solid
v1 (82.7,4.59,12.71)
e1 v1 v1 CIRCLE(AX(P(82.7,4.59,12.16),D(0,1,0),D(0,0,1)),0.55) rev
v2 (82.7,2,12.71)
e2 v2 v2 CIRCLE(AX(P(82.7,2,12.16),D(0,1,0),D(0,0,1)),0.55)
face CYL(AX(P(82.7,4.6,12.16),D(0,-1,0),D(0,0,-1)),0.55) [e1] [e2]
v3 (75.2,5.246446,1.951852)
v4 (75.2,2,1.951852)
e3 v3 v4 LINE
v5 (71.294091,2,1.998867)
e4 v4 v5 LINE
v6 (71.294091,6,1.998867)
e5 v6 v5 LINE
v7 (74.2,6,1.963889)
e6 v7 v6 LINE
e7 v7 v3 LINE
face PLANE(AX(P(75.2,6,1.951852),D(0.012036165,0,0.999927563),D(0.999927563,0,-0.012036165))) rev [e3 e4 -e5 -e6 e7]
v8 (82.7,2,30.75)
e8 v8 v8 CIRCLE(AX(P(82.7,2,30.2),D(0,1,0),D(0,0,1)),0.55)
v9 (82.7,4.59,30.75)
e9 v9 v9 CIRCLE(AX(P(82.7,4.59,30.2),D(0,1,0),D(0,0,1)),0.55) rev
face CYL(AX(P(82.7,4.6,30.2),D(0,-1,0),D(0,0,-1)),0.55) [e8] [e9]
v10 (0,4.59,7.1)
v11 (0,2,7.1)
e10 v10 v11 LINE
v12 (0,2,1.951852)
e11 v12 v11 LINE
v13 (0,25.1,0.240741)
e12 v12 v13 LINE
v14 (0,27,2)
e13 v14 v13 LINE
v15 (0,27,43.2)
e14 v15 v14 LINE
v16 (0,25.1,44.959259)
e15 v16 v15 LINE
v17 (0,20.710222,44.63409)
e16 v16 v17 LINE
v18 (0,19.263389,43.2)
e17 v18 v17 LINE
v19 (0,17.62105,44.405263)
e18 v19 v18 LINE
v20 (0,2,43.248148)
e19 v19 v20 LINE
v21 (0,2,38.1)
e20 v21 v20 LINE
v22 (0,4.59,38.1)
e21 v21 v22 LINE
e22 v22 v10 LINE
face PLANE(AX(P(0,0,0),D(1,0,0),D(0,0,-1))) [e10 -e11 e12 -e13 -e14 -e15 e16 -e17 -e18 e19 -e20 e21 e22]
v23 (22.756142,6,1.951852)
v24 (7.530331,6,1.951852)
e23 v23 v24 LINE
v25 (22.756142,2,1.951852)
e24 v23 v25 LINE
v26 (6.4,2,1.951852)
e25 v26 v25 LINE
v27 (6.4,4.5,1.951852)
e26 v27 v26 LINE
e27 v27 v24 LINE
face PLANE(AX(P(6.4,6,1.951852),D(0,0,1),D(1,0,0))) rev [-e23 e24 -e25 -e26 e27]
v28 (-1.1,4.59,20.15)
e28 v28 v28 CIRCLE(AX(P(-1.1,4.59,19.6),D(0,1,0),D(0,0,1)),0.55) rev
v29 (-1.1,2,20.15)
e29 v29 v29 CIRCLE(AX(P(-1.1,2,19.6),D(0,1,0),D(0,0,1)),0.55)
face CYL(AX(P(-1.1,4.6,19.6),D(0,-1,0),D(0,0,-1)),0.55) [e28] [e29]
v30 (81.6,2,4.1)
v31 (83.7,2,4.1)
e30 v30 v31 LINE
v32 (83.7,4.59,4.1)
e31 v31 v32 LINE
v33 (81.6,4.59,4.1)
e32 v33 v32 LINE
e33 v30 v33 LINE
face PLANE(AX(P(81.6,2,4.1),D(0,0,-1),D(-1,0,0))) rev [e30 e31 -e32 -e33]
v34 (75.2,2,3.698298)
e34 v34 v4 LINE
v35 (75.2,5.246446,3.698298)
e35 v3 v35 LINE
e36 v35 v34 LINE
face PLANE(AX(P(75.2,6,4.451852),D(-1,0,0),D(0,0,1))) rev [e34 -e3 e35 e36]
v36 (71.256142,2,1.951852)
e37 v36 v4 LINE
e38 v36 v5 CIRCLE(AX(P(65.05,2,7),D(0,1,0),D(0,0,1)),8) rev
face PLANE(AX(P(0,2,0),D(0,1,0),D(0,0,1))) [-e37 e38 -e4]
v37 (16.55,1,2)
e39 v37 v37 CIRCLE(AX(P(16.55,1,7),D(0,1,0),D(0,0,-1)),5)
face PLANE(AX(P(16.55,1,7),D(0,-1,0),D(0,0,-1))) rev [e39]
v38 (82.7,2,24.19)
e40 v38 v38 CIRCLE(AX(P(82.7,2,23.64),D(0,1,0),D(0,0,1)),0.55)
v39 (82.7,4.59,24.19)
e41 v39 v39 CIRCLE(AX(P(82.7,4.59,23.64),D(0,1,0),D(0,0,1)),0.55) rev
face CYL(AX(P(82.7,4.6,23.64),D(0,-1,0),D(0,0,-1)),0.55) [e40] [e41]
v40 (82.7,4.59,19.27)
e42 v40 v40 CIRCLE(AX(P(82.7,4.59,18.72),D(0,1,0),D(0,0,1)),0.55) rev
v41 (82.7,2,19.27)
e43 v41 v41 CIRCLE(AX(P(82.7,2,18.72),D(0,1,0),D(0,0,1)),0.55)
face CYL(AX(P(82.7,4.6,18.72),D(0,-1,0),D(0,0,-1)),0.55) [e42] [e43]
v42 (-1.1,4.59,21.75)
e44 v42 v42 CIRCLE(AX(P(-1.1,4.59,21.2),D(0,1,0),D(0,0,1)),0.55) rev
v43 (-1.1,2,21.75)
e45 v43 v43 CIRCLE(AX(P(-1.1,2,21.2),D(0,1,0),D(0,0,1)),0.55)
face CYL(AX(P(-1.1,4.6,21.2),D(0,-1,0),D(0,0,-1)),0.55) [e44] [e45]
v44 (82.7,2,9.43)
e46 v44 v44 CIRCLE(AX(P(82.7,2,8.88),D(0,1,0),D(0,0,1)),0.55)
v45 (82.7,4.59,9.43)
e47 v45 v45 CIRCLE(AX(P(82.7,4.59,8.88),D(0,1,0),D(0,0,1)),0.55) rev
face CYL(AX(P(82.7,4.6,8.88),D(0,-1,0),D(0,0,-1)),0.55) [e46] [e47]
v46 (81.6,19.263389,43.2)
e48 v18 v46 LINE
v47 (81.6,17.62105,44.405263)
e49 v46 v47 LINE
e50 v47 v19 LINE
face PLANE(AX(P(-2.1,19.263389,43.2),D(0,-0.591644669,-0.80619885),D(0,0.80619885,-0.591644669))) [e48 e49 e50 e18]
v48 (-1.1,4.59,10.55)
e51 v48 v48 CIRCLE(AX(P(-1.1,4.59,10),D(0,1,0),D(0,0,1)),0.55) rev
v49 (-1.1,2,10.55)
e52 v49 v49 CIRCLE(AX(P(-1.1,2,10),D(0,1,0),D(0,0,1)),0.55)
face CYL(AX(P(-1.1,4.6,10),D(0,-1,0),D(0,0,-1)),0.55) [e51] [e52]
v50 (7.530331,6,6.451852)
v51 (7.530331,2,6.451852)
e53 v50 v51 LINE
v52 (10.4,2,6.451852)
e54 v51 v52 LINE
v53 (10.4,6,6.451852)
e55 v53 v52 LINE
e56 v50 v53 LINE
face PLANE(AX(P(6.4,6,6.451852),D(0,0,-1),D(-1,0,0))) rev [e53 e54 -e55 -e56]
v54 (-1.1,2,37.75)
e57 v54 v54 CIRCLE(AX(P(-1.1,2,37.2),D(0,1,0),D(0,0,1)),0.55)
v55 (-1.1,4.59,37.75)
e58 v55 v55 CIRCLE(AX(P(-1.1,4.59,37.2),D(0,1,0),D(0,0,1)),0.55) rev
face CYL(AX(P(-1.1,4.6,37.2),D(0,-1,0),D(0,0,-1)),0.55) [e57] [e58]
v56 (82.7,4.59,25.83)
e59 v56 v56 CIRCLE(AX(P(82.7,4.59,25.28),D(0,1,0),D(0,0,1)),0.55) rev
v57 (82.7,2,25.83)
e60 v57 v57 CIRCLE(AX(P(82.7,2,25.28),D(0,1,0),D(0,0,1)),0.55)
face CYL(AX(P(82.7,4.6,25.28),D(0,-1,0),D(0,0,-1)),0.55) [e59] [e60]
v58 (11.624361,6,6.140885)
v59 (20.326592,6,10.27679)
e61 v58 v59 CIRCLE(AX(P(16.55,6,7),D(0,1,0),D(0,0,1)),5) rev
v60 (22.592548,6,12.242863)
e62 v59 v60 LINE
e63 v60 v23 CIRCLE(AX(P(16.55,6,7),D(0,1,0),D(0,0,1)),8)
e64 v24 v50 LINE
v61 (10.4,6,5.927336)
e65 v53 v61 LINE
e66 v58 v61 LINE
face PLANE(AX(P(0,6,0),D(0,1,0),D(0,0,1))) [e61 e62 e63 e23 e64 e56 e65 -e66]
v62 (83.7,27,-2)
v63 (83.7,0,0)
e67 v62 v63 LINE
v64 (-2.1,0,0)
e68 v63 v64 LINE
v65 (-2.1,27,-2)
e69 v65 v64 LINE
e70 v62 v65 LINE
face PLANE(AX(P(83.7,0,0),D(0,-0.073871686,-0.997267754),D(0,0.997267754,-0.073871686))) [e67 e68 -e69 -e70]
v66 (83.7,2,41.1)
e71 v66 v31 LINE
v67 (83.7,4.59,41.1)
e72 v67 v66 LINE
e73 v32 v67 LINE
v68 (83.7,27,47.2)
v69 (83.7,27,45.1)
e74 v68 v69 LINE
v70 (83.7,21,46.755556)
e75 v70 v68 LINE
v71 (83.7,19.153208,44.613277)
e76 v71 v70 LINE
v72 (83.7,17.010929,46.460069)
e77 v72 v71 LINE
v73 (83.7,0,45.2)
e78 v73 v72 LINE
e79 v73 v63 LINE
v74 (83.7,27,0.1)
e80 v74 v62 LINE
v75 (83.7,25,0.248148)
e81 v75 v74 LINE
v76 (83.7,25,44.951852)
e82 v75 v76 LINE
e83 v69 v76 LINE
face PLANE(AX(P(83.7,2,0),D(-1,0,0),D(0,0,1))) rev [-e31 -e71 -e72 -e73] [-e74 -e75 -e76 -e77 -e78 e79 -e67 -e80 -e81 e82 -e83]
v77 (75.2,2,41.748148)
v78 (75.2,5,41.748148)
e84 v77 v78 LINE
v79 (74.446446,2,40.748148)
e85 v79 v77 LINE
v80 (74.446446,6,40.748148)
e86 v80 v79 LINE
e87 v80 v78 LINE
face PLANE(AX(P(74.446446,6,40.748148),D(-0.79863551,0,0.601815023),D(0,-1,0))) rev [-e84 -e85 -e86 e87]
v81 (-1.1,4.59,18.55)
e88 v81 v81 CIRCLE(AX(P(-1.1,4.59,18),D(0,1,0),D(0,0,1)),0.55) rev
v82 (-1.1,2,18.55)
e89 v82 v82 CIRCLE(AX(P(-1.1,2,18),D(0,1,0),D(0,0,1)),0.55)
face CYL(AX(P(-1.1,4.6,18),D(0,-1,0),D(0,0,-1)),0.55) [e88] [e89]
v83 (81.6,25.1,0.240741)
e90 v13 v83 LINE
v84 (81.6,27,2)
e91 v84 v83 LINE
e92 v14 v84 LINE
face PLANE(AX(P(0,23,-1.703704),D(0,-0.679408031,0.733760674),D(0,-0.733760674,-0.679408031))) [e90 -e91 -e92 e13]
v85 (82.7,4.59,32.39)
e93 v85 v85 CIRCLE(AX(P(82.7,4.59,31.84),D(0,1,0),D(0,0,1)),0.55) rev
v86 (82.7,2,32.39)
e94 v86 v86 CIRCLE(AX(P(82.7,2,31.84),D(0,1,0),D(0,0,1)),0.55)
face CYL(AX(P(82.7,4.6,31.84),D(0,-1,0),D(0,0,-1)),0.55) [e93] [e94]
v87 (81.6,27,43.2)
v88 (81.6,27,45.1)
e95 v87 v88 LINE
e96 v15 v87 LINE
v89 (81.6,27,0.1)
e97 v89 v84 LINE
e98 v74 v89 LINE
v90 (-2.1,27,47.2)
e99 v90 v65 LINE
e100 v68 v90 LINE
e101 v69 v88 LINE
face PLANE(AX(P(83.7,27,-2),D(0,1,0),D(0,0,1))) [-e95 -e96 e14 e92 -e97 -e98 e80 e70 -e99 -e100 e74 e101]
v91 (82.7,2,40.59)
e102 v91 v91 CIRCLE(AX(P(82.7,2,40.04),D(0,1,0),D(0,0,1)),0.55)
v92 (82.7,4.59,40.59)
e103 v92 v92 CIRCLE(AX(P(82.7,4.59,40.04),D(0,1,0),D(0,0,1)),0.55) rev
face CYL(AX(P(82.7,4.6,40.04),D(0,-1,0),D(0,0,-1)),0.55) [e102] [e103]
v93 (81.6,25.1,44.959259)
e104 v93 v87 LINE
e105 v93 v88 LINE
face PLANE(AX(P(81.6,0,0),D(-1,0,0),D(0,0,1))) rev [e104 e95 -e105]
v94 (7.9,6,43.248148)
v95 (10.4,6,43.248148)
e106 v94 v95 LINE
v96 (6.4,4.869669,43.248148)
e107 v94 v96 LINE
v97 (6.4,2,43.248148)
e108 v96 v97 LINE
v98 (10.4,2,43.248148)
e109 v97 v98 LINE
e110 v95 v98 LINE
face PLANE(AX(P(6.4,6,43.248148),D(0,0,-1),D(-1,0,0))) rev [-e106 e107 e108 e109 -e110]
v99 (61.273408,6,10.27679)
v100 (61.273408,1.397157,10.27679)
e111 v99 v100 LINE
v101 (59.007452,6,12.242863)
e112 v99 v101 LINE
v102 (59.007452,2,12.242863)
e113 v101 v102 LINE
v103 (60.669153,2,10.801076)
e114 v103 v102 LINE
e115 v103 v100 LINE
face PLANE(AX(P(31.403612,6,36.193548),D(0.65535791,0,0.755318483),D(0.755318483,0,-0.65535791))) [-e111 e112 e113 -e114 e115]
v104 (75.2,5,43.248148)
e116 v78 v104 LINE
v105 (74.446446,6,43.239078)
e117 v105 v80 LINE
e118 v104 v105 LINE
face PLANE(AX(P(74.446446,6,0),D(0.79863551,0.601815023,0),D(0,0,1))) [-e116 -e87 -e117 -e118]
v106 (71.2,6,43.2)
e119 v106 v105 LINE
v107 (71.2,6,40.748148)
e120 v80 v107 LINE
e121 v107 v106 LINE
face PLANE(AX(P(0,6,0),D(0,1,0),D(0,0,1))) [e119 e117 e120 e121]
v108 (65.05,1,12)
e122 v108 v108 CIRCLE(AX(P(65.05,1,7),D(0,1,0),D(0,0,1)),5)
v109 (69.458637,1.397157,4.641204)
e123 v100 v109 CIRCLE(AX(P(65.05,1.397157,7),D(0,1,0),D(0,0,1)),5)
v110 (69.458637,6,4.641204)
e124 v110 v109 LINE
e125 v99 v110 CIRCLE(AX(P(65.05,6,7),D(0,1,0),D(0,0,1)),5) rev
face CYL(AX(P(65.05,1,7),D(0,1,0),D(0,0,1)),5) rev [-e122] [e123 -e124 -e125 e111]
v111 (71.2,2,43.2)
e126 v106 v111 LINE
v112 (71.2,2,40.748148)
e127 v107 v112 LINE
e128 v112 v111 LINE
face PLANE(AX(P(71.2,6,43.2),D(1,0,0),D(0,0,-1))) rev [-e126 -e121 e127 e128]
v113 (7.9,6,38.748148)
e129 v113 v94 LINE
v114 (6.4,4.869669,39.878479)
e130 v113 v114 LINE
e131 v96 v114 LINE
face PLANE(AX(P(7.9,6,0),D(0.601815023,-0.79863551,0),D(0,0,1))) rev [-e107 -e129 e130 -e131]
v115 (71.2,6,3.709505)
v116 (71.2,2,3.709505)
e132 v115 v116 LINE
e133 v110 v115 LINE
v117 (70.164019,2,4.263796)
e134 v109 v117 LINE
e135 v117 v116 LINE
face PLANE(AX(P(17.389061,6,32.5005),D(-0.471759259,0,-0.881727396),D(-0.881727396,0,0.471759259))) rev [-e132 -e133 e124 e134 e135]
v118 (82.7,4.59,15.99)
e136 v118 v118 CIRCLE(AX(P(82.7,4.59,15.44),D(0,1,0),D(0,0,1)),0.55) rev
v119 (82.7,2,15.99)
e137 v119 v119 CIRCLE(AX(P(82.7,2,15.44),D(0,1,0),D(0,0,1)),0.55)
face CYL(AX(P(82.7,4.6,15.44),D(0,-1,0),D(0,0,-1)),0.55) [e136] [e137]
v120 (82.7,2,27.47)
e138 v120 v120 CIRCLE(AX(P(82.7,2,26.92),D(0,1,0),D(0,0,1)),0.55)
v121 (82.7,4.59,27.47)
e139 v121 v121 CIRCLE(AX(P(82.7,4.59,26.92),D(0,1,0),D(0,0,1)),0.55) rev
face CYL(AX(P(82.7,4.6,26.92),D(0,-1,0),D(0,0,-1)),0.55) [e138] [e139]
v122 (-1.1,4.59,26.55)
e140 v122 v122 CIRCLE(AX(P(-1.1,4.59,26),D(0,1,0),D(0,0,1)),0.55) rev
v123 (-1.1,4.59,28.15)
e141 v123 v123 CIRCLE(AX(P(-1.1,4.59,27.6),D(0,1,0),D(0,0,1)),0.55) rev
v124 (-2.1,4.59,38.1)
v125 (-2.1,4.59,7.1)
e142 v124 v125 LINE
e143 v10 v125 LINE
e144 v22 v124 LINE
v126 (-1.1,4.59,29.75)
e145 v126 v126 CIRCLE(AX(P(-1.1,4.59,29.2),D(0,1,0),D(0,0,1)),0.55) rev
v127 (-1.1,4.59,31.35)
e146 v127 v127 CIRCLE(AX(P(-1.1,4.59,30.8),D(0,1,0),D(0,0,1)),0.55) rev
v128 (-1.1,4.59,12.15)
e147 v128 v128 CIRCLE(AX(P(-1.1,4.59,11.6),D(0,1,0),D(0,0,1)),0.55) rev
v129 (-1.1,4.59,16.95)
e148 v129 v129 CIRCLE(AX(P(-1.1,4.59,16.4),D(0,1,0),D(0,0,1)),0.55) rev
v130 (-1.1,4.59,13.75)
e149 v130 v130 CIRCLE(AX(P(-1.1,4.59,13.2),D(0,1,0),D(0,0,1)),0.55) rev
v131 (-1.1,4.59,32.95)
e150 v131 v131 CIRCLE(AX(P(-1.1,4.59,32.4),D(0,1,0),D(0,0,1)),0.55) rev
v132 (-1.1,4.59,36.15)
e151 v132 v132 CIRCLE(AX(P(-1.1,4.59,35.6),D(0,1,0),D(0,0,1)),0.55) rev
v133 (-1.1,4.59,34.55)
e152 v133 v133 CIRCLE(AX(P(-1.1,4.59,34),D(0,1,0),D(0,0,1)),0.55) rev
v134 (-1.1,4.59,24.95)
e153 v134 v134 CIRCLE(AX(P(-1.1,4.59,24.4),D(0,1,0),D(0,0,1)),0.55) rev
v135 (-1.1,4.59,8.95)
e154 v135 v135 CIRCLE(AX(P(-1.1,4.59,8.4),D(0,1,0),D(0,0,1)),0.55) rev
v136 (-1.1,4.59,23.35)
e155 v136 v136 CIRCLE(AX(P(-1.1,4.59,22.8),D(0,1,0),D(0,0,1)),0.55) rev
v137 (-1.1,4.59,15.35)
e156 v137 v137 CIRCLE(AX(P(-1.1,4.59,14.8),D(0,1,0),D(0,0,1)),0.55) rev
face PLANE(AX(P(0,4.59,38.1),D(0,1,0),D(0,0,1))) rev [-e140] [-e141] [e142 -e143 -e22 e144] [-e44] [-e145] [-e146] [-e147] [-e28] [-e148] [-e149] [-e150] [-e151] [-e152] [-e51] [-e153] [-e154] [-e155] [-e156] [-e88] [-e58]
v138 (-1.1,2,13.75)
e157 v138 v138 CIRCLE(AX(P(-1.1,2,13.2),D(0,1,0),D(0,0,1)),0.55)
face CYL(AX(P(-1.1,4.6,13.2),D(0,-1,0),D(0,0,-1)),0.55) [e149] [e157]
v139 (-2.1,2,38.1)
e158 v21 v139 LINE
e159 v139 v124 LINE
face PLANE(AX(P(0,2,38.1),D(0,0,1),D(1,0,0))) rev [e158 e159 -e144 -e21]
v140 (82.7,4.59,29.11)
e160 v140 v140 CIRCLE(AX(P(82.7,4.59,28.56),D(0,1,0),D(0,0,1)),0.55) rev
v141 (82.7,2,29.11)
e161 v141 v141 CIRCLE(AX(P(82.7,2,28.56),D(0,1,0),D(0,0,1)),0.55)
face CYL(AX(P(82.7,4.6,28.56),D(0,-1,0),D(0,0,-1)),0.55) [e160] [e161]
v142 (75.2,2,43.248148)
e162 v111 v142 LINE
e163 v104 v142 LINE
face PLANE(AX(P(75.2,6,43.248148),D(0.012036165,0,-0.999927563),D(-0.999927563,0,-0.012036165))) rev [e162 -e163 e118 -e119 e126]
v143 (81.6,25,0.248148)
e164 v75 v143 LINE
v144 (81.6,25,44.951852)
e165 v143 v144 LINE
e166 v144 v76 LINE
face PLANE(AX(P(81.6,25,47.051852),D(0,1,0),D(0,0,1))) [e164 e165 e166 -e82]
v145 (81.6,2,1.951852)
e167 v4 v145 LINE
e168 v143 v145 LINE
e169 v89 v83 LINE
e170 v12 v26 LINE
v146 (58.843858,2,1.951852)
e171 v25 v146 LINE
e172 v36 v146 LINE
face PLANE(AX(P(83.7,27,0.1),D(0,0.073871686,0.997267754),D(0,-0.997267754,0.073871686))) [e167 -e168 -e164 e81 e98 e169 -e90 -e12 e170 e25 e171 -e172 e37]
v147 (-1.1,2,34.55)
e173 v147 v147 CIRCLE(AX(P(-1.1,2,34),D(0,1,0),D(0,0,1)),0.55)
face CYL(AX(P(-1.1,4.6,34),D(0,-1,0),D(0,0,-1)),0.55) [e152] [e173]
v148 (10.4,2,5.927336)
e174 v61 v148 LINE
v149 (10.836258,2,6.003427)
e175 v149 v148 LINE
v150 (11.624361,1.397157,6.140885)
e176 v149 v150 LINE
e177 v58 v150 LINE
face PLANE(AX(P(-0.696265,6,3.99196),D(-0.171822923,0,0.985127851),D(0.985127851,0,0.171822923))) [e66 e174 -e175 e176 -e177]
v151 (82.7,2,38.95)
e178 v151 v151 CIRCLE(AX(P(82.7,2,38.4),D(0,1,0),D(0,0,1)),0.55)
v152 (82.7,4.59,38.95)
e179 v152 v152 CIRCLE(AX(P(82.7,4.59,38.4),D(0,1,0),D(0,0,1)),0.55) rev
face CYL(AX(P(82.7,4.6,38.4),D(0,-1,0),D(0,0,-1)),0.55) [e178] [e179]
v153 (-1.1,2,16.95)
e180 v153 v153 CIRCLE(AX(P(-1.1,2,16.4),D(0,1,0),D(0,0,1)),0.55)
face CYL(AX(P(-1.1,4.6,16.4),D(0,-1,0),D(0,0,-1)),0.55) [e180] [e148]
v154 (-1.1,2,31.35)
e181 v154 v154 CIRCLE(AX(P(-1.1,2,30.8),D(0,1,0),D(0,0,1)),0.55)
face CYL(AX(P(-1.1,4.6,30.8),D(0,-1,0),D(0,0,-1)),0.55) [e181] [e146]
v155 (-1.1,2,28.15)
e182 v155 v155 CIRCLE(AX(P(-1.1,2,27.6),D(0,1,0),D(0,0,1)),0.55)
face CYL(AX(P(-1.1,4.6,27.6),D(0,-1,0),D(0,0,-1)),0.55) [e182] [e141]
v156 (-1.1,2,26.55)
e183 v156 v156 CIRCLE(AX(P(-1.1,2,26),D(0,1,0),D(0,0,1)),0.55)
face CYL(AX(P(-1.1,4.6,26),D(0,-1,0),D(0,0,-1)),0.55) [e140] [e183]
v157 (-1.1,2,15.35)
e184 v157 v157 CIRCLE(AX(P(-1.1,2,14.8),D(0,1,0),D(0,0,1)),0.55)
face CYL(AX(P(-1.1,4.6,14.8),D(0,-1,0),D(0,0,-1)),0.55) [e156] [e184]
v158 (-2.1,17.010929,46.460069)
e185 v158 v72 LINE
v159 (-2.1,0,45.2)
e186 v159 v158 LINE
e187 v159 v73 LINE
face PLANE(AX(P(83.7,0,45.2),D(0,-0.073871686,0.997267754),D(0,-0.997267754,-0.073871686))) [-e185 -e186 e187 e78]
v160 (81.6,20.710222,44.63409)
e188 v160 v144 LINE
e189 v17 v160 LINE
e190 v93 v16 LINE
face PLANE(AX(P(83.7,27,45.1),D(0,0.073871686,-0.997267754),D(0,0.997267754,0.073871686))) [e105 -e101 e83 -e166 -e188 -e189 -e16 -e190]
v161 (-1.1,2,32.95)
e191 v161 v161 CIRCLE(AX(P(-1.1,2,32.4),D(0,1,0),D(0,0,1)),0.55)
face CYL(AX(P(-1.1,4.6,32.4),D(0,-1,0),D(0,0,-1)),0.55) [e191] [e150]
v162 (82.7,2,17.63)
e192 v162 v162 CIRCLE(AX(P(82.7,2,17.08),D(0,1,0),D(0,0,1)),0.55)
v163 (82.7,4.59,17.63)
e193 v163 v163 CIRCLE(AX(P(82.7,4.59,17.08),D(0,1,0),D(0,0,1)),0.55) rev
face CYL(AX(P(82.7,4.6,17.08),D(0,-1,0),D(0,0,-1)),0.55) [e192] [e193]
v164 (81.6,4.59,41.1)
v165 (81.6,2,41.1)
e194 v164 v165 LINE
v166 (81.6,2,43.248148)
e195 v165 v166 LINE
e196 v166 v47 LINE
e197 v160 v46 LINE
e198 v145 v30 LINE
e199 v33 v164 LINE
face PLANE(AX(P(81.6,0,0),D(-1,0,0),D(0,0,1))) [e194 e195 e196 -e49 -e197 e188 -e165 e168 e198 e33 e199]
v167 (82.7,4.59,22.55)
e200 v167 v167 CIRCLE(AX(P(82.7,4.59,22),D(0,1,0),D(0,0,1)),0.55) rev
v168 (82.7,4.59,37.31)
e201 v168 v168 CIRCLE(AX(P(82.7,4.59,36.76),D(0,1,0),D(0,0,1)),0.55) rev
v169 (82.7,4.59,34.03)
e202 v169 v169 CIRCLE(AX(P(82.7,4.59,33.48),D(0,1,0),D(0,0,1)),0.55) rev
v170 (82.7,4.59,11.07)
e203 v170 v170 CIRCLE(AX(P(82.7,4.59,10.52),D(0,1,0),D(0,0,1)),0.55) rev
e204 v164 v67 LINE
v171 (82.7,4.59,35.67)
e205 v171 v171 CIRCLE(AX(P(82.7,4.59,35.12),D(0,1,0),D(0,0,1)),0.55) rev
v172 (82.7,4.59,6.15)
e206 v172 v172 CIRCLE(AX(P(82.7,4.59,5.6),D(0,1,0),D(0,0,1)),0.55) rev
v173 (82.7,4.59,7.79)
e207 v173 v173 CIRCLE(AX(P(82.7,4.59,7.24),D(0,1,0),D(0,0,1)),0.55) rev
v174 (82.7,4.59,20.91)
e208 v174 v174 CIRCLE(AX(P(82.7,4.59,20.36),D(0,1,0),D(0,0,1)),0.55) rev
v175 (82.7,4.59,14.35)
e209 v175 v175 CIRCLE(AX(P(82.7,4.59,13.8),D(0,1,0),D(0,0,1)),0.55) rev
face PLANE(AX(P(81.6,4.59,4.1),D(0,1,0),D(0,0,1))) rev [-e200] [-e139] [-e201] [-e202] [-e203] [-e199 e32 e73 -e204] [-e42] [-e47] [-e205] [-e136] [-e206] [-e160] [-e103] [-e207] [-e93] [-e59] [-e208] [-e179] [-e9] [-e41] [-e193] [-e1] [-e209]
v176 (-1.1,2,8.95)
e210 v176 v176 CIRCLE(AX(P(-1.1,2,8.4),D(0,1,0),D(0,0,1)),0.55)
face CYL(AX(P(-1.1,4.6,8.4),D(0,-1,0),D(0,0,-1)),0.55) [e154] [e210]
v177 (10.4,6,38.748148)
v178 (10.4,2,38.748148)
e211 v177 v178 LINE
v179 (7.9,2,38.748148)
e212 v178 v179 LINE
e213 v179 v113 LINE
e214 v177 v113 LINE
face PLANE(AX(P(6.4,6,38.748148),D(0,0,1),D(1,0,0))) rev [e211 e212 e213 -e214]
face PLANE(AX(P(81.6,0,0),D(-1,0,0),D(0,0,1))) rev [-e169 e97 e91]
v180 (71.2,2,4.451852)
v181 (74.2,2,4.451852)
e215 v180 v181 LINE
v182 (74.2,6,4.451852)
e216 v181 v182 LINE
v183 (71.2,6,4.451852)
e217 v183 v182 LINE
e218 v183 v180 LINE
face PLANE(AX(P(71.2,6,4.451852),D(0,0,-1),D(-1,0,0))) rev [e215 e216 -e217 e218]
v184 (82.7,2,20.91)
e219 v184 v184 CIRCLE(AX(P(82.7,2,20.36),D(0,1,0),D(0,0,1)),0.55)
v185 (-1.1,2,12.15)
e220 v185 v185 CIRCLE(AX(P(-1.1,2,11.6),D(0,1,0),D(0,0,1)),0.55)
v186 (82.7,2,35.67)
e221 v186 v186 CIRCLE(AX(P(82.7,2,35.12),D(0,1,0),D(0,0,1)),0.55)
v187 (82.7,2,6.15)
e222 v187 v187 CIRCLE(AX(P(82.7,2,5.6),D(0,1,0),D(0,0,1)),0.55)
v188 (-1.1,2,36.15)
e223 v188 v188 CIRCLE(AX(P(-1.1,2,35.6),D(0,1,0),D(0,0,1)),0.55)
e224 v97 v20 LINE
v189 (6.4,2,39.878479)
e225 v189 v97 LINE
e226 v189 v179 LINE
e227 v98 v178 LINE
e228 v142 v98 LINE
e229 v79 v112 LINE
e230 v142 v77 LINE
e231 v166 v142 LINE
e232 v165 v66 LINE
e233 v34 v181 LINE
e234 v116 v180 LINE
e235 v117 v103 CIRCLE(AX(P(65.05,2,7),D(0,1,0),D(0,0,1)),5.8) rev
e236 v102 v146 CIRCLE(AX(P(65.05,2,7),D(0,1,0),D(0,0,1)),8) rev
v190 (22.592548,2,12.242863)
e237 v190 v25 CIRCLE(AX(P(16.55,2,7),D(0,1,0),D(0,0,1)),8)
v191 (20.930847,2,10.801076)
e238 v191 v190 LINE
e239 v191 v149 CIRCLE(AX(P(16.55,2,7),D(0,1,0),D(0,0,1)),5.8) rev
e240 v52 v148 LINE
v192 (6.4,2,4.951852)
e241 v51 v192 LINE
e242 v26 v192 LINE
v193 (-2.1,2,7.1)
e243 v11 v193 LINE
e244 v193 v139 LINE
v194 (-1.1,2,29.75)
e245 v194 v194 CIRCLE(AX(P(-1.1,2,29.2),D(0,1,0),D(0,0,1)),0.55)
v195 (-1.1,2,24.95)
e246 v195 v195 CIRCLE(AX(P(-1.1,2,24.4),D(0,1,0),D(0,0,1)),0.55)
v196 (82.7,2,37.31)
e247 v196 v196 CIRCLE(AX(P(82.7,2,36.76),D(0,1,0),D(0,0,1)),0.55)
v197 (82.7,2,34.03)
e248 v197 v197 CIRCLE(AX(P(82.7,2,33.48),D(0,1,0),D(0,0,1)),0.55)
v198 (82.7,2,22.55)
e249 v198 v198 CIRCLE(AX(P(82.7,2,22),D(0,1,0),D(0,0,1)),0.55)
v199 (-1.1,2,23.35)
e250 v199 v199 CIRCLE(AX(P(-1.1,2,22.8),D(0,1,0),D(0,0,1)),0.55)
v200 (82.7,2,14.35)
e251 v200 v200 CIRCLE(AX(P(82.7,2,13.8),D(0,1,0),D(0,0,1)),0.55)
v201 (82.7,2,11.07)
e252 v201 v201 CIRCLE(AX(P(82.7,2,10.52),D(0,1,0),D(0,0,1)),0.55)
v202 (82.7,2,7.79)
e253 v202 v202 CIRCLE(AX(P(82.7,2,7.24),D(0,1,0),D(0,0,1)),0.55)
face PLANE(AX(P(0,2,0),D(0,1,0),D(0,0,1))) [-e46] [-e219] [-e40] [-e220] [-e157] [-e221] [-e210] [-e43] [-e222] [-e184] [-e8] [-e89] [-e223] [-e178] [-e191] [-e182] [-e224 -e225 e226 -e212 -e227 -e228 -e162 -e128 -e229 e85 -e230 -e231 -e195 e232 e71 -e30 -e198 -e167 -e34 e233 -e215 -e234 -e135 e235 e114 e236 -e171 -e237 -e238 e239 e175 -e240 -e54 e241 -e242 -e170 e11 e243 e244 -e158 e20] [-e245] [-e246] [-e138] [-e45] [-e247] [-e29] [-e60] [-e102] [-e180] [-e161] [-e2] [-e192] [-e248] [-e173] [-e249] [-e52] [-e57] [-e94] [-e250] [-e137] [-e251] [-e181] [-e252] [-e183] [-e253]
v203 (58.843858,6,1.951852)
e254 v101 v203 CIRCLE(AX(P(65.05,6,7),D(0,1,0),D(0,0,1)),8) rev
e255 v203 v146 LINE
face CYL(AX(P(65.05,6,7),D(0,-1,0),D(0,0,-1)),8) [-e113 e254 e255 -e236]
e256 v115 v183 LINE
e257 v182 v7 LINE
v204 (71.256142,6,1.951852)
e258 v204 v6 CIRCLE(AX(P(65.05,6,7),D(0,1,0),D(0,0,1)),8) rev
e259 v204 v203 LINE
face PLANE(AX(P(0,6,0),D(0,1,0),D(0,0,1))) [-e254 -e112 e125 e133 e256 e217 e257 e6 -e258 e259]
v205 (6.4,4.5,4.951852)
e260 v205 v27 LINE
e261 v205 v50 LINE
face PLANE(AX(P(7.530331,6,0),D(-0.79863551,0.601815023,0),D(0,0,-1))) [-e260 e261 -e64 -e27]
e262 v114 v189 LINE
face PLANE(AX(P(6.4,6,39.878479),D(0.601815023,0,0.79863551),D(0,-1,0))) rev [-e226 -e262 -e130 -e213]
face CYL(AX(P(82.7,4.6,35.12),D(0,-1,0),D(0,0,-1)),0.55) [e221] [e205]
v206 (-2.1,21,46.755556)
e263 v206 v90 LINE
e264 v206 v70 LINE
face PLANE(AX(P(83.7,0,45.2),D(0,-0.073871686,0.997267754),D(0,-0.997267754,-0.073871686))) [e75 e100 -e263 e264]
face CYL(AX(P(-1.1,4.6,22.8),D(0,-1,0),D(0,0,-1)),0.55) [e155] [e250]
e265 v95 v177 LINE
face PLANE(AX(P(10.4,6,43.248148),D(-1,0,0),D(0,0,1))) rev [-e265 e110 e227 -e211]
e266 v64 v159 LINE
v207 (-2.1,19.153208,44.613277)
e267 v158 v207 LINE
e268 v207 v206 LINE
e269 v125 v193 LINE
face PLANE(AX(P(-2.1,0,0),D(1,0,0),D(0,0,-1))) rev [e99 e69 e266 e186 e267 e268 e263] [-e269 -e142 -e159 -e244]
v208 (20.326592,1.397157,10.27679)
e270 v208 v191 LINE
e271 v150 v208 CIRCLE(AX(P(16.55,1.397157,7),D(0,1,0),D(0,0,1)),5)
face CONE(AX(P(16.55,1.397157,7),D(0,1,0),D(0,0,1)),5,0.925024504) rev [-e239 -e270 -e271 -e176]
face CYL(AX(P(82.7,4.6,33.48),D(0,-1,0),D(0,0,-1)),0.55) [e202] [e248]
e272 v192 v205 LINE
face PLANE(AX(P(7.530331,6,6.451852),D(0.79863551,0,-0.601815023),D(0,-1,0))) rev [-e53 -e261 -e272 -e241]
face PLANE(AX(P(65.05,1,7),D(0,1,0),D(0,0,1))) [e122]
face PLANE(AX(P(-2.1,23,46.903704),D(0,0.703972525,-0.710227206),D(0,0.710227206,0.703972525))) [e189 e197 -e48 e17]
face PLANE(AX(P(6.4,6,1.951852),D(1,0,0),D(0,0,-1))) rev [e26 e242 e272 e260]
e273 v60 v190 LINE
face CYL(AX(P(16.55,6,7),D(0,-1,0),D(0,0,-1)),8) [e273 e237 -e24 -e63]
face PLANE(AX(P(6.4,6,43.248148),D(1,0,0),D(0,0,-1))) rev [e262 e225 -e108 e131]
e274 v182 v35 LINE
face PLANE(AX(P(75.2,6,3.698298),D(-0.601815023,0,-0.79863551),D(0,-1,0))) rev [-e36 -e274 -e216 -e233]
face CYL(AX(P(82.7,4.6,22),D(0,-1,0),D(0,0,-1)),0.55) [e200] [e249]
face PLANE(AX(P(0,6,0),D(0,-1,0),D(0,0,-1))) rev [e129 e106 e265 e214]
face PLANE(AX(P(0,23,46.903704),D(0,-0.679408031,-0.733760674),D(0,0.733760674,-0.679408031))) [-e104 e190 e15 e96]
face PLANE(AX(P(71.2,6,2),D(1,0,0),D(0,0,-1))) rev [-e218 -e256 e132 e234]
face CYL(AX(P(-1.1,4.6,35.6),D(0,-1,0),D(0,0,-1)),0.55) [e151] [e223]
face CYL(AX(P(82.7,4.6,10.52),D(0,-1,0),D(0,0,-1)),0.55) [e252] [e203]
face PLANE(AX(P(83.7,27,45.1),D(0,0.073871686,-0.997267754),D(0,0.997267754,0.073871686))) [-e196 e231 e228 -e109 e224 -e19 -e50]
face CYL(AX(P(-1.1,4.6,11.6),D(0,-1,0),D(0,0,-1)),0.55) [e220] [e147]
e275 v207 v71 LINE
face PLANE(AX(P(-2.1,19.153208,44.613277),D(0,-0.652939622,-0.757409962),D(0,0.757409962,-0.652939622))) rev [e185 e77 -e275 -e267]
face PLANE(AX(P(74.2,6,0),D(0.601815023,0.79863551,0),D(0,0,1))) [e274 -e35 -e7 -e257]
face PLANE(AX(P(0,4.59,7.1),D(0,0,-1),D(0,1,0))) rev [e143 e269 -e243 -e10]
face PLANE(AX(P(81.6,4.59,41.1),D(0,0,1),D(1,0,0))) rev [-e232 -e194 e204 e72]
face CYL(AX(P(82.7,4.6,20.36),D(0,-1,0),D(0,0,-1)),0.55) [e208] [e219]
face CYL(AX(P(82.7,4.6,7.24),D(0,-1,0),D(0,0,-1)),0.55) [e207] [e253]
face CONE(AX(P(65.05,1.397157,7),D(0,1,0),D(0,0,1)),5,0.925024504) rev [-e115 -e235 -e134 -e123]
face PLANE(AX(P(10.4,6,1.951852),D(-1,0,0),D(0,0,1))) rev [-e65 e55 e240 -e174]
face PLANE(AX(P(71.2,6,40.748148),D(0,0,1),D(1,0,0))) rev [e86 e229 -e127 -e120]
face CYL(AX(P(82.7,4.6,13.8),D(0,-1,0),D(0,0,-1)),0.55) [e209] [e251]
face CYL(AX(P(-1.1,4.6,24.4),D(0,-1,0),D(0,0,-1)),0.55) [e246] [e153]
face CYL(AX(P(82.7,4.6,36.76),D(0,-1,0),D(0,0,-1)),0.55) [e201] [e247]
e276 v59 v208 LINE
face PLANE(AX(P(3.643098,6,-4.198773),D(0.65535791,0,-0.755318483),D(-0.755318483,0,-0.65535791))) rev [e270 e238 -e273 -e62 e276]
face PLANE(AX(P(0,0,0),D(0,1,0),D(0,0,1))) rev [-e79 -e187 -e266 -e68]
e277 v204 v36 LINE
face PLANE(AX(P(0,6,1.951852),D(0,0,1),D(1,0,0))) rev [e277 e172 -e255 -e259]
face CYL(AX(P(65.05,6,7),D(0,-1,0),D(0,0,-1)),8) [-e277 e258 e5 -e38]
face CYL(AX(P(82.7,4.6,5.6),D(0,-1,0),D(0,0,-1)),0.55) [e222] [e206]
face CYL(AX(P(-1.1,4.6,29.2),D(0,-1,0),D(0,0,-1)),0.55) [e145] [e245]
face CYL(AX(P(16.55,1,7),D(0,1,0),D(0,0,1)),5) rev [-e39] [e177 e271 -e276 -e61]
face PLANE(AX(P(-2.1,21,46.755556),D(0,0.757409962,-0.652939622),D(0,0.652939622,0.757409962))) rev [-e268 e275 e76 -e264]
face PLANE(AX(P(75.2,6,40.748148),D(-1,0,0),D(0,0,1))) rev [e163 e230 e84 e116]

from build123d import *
from OCP.BRepFilletAPI import BRepFilletAPI_MakeChamfer

# Parameters (mm, degrees)
ESBO_O1_W                   = 83.7
ESBO_O1_H                   = 45.2
BASE_DEPTH                  = 2
PAREDES_LATERAIS_DEPTH      = 83.7
PAREDE_CORPO_DEPTH          = 2.1
PAREDE_CABE_A_DEPTH         = 2.1
TRILHO_START                = -2.1
TRILHO_TAMPA_DEPTH          = 81.6
TRILHO_CORE_REACH           = 103.58
CORTE_TRILHO_CORE_DEPTH     = 102.579919275
ESBO_O19_W                  = 37
ESBO_O19_H                  = 2.59
CORTE_CONECTOR_CABE_A_DEPTH = 2.1
ESBO_O20_W                  = 31
ESBO_O20_H                  = 2.59
CORTE_CONECTOR_CORPO_DEPTH  = 2.1
ESBO_O21_W                  = 4
ESBO_O21_H                  = 4.5
APOIO_CONECTOR_CABE_A_DEPTH = 4
ESBO_O22_R                  = 5
CORTE_IM_DEPTH              = 1
RESSALTO_EXTRUS_O15_START   = 4
RESSALTO_EXTRUS_O15_DEPTH   = 4
CHANFRO7_SIZE               = 0.60284324
CHANFRO7_SIZE_2             = 0.8
ESBO_O25_R                  = 0.55
RESSALTO_EXTRUS_O16_DEPTH   = 2.6
ESBO_O27_R                  = 0.55
RESSALTO_EXTRUS_O17_DEPTH   = 2.6
CHANFRO5_SIZE               = 1
CHANFRO5_SIZE2              = 0.75355405
CHANFRO6_SIZE               = 1.5
CHANFRO6_SIZE2              = 1.130331075


with BuildPart() as part:
    # Esboço1 → Base (new body)
    with BuildSketch(Plane(origin=(0, 0, 0), x_dir=(1, 0, 0), z_dir=(0, 1, 0))):
        with Locations((41.85, -22.6)):
            Rectangle(ESBO_O1_W, ESBO_O1_H)
    extrude(amount=BASE_DEPTH)

    # Esboço10 → Paredes Laterais (add, through all)
    with BuildSketch(Plane.ZY):
        Polygon((0, 0), (-2, 27), (0.1, 27), (2.1, 0), align=None)
        Polygon((43.1, 0), (45.2, 0), (47.2, 27), (45.1, 27), align=None)
    extrude(amount=-PAREDES_LATERAIS_DEPTH)

    # Esboço12 → Parede Corpo (add)
    with BuildSketch(Plane.ZY):
        Polygon((45.2, 0), (0, 0), (-2, 27), (47.2, 27), align=None)
    extrude(amount=PAREDE_CORPO_DEPTH)

    # Esboço13 → Parede Cabeça (add)
    with BuildSketch(Plane(origin=(83.7, 0, 0), x_dir=(0, 0, -1), z_dir=(1, 0, 0))):
        Polygon((-47.051851852, 25), (1.851851852, 25), (0, 0), (-45.2, 0), align=None)
    extrude(amount=-PAREDE_CABE_A_DEPTH)

    # Esboço14 → Trilho Tampa (add)
    with BuildSketch(Plane(origin=(83.7, 0, 0), x_dir=(0, 0, -1), z_dir=(1, 0, 0)).offset(TRILHO_START)):
        Polygon((-46.903703704, 23), (-43.2, 27), (-47.2, 27), align=None)
        Polygon((2, 27), (1.703703704, 23), (-2, 27), align=None)
    extrude(amount=-TRILHO_TAMPA_DEPTH)

    # Esboço15 → Trilho Core (add, up to next)
    with BuildSketch(Plane(origin=(83.7, 0, 0), x_dir=(0, 0, -1), z_dir=(1, 0, 0)), mode=Mode.PRIVATE) as trilho_core_sk1:
        Polygon((-46.903703704, 23), (-43.2, 19.263389498), (-46.31273022, 15.021857964), align=None)
    trilho_core_tool1 = extrude(trilho_core_sk1.sketch, amount=-TRILHO_CORE_REACH, mode=Mode.PRIVATE) - part.part
    add(trilho_core_tool1.solids().sort_by_distance((83.7, 19.095082, 45.472145))[0])

    # Esboço18 → Corte Trilho core (cut, through all)
    with BuildSketch(Plane(origin=(83.7, 0, 0), x_dir=(0, 0, -1), z_dir=(1, 0, 0))):
        Polygon((-46.755555556, 21), (-44.613276676, 19.153207862), (-46.460068813, 17.010928982), align=None)
    extrude(amount=-CORTE_TRILHO_CORE_DEPTH, mode=Mode.SUBTRACT)

    # Esboço19 → Corte - Conector Cabeça (cut)
    with BuildSketch(Plane(origin=(83.7, 0, 0), x_dir=(0, 0, -1), z_dir=(1, 0, 0))):
        with Locations((-22.6, 3.295)):
            Rectangle(ESBO_O19_W, ESBO_O19_H)
    extrude(amount=-CORTE_CONECTOR_CABE_A_DEPTH, mode=Mode.SUBTRACT)

    # Esboço20 → Corte-Conector Corpo (cut)
    with BuildSketch(Plane.ZY.offset(2.1)):
        with Locations((22.6, 3.295)):
            Rectangle(ESBO_O20_W, ESBO_O20_H)
    extrude(amount=-CORTE_CONECTOR_CORPO_DEPTH, mode=Mode.SUBTRACT)

    # Esboço21 → Apoio Conector Cabeça (add)
    with BuildSketch(Plane(origin=(0, 2, 0), x_dir=(1, 0, 0), z_dir=(0, 1, 0))):
        Polygon((71.2, -2), (71.2, -4.451851852), (75.2, -4.451851852), (75.2, -1.951851852), align=None)
        Polygon((75.2, -43.248148148), (71.2, -43.2), (71.2, -40.748148148), (75.2, -40.748148148), align=None)
        with Locations((8.4, -4.201851852)):
            Rectangle(ESBO_O21_W, ESBO_O21_H)
        with Locations((8.4, -40.998148148)):
            Rectangle(ESBO_O21_W, ESBO_O21_H)
    extrude(amount=APOIO_CONECTOR_CABE_A_DEPTH)

    # Esboço22 → Corte-imã (cut)
    with BuildSketch(Plane(origin=(0, 2, 0), x_dir=(1, 0, 0), z_dir=(0, 1, 0))):
        with Locations(Location((65.05, -7, 0), (0, 0, 270))):
            Circle(ESBO_O22_R)
        with Locations(Location((16.55, -7, 0), (0, 0, 90))):
            Circle(ESBO_O22_R)
    extrude(amount=-CORTE_IM_DEPTH, mode=Mode.SUBTRACT)

    # Esboço24 → Ressalto-extrusão15 (add)
    with BuildSketch(Plane(origin=(0, 2, 0), x_dir=(1, 0, 0), z_dir=(0, 1, 0)).offset(RESSALTO_EXTRUS_O15_START)):
        with BuildLine():
            ThreePointArc((11.624360744, -6.140885386), (18.696276537, -2.484084032), (20.326592413, -10.276789549))
            Line((20.326592413, -10.276789549), (22.59254786, -12.242863278))
            ThreePointArc((22.59254786, -12.242863278), (24.548989357, -7.127158435), (22.756142141, -1.951851852))
            Line((22.756142141, -1.951851852), (10.4, -1.951851852))
            Line((10.4, -1.951851852), (10.4, -5.92733621))
            Line((10.4, -5.92733621), (11.624360744, -6.140885386))
        make_face()
        with BuildLine():
            Line((71.256142141, -1.951851852), (58.843857859, -1.951851852))
            ThreePointArc((58.843857859, -1.951851852), (57.051010643, -7.127158435), (59.00745214, -12.242863278))
            Line((59.00745214, -12.242863278), (61.273407587, -10.276789549))
            ThreePointArc((61.273407587, -10.276789549), (62.214541124, -2.881726944), (69.458636981, -4.641203704))
            Line((69.458636981, -4.641203704), (71.2, -3.709505164))
            Line((71.2, -3.709505164), (71.2, -2))
            Line((71.2, -2), (71.294091042, -1.998867423))
            ThreePointArc((71.294091042, -1.998867423), (71.275160977, -1.975323811), (71.256142141, -1.951851852))
        make_face()
    extrude(amount=-RESSALTO_EXTRUS_O15_DEPTH)

    # Chanfro7
    # the kernel refuses this chamfer: 0.8, 0.60284324 mm, written as the material it takes off along each edge
    with BuildSketch(Plane(origin=(16.55, 2, 7), x_dir=(-0.9851278512038923, 0, -0.17182292275014302), z_dir=(0.17182292275014302, 0, -0.9851278512038923))) as chanfro7_piece_1:
        Polygon((5, -CHANFRO7_SIZE), (5 + CHANFRO7_SIZE_2, 0), (5, 0), align=None)
    revolve(axis=Axis((16.55, 2, 7), (0, 1, 0)), revolution_arc=148.947030432, mode=Mode.SUBTRACT)
    with BuildSketch(Plane(origin=(65.05, 2, 7), x_dir=(0, 0, 1), z_dir=(-1, 0, 0))) as chanfro7_piece_2:
        Polygon((5, -CHANFRO7_SIZE), (5 + CHANFRO7_SIZE_2, 0), (5, 0), align=None)
    revolve(axis=Axis((65.05, 2, 7), (0, 1, 0)), revolution_arc=118.148554584, mode=Mode.SUBTRACT)
    with BuildSketch(Plane(origin=(65.05, 2, 7), x_dir=(-0.7553184825362543, 0, 0.6553579098013009), z_dir=(-0.6553579098013009, 0, -0.7553184825362543))) as chanfro7_piece_3:
        Polygon((5, -CHANFRO7_SIZE), (5 + CHANFRO7_SIZE_2, 0), (5, 0), align=None)
    revolve(axis=Axis((65.05, 2, 7), (0, 1, 0)), revolution_arc=49.053205856, mode=Mode.SUBTRACT)

    # Esboço25 → Ressalto-extrusão16 (add)
    with BuildSketch(Plane(origin=(0, 2, 0), x_dir=(1, 0, 0), z_dir=(0, 1, 0))):
        with Locations(Location((82.7, -5.6, 0), (0, 0, 270))):
            Circle(ESBO_O25_R)
        with Locations(Location((82.7, -7.24, 0), (0, 0, 270))):
            Circle(ESBO_O25_R)
        with Locations(Location((82.7, -8.88, 0), (0, 0, 270))):
            Circle(ESBO_O25_R)
        with Locations(Location((82.7, -10.52, 0), (0, 0, 270))):
            Circle(ESBO_O25_R)
        with Locations(Location((82.7, -12.16, 0), (0, 0, 270))):
            Circle(ESBO_O25_R)
        with Locations(Location((82.7, -13.8, 0), (0, 0, 270))):
            Circle(ESBO_O25_R)
        with Locations(Location((82.7, -15.44, 0), (0, 0, 270))):
            Circle(ESBO_O25_R)
        with Locations(Location((82.7, -17.08, 0), (0, 0, 270))):
            Circle(ESBO_O25_R)
        with Locations(Location((82.7, -18.72, 0), (0, 0, 270))):
            Circle(ESBO_O25_R)
        with Locations(Location((82.7, -20.36, 0), (0, 0, 270))):
            Circle(ESBO_O25_R)
        with Locations(Location((82.7, -22, 0), (0, 0, 270))):
            Circle(ESBO_O25_R)
        with Locations(Location((82.7, -23.64, 0), (0, 0, 270))):
            Circle(ESBO_O25_R)
        with Locations(Location((82.7, -25.28, 0), (0, 0, 270))):
            Circle(ESBO_O25_R)
        with Locations(Location((82.7, -26.92, 0), (0, 0, 270))):
            Circle(ESBO_O25_R)
        with Locations(Location((82.7, -28.56, 0), (0, 0, 270))):
            Circle(ESBO_O25_R)
        with Locations(Location((82.7, -30.2, 0), (0, 0, 270))):
            Circle(ESBO_O25_R)
        with Locations(Location((82.7, -31.84, 0), (0, 0, 270))):
            Circle(ESBO_O25_R)
        with Locations(Location((82.7, -33.48, 0), (0, 0, 270))):
            Circle(ESBO_O25_R)
        with Locations(Location((82.7, -35.12, 0), (0, 0, 270))):
            Circle(ESBO_O25_R)
        with Locations(Location((82.7, -36.76, 0), (0, 0, 270))):
            Circle(ESBO_O25_R)
        with Locations(Location((82.7, -38.4, 0), (0, 0, 270))):
            Circle(ESBO_O25_R)
        with Locations(Location((82.7, -40.04, 0), (0, 0, 270))):
            Circle(ESBO_O25_R)
    extrude(amount=RESSALTO_EXTRUS_O16_DEPTH)

    # Esboço27 → Ressalto-extrusão17 (add)
    with BuildSketch(Plane(origin=(0, 2, 0), x_dir=(1, 0, 0), z_dir=(0, 1, 0))):
        with Locations(Location((-1.1, -8.4, 0), (0, 0, 270))):
            Circle(ESBO_O27_R)
        with Locations(Location((-1.1, -10, 0), (0, 0, 270))):
            Circle(ESBO_O27_R)
        with Locations(Location((-1.1, -11.6, 0), (0, 0, 270))):
            Circle(ESBO_O27_R)
        with Locations(Location((-1.1, -13.2, 0), (0, 0, 270))):
            Circle(ESBO_O27_R)
        with Locations(Location((-1.1, -14.8, 0), (0, 0, 270))):
            Circle(ESBO_O27_R)
        with Locations(Location((-1.1, -16.4, 0), (0, 0, 270))):
            Circle(ESBO_O27_R)
        with Locations(Location((-1.1, -18, 0), (0, 0, 270))):
            Circle(ESBO_O27_R)
        with Locations(Location((-1.1, -19.6, 0), (0, 0, 270))):
            Circle(ESBO_O27_R)
        with Locations(Location((-1.1, -21.2, 0), (0, 0, 270))):
            Circle(ESBO_O27_R)
        with Locations(Location((-1.1, -22.8, 0), (0, 0, 270))):
            Circle(ESBO_O27_R)
        with Locations(Location((-1.1, -24.4, 0), (0, 0, 270))):
            Circle(ESBO_O27_R)
        with Locations(Location((-1.1, -26, 0), (0, 0, 270))):
            Circle(ESBO_O27_R)
        with Locations(Location((-1.1, -27.6, 0), (0, 0, 270))):
            Circle(ESBO_O27_R)
        with Locations(Location((-1.1, -29.2, 0), (0, 0, 270))):
            Circle(ESBO_O27_R)
        with Locations(Location((-1.1, -30.8, 0), (0, 0, 270))):
            Circle(ESBO_O27_R)
        with Locations(Location((-1.1, -32.4, 0), (0, 0, 270))):
            Circle(ESBO_O27_R)
        with Locations(Location((-1.1, -34, 0), (0, 0, 270))):
            Circle(ESBO_O27_R)
        with Locations(Location((-1.1, -35.6, 0), (0, 0, 270))):
            Circle(ESBO_O27_R)
        with Locations(Location((-1.1, -37.2, 0), (0, 0, 270))):
            Circle(ESBO_O27_R)
    extrude(amount=RESSALTO_EXTRUS_O17_DEPTH)

    # Chanfro5: one chamfer whose edges measure the first distance from different faces: ONE call of the kernel's chamfer builder (chamfer() names one face for all edges)
    chanfro5_edges_1 = [part.edges().sort_by_distance(p)[0] for p in [
        (75.2, 4, 4.451851852),
    ]]
    chanfro5_side_1 = [part.faces().sort_by_distance(p)[0] for p in [
        (73.2, 4, 4.451851852),
    ]]
    chanfro5_edges_2 = [part.edges().sort_by_distance(p)[0] for p in [
        (75.2, 6, 3.201851852),
    ]]
    chanfro5_side_2 = [part.faces().sort_by_distance(p)[0] for p in [
        (65.05, 6, 1.972716353),
    ]]
    chanfro5_edges_3 = [part.edges().sort_by_distance(p)[0] for p in [
        (75.2, 4, 40.748148148),
        (75.2, 6, 41.998148148),
    ]]
    chanfro5_side_3 = [part.faces().sort_by_distance(p)[0] for p in [
        (75.2, 4, 41.998148148),
    ]]
    chanfro5 = BRepFilletAPI_MakeChamfer(part.part.solid().wrapped)
    for e in chanfro5_edges_1:
        chanfro5.Add(CHANFRO5_SIZE, CHANFRO5_SIZE2, e.wrapped, chanfro5_side_1[0].wrapped)  # the first distance lies on this face
    for e in chanfro5_edges_2:
        chanfro5.Add(CHANFRO5_SIZE, CHANFRO5_SIZE2, e.wrapped, chanfro5_side_2[0].wrapped)  # the first distance lies on this face
    for e in chanfro5_edges_3:
        chanfro5.Add(CHANFRO5_SIZE, CHANFRO5_SIZE2, e.wrapped, chanfro5_side_3[0].wrapped)  # the first distance lies on this face
    add(Compound.cast(chanfro5.Shape()), mode=Mode.REPLACE)

    # Chanfro6: one chamfer whose edges measure the first distance from different faces: ONE call of the kernel's chamfer builder (chamfer() names one face for all edges)
    chanfro6_edges_1 = [part.edges().sort_by_distance(p)[0] for p in [
        (6.4, 4, 6.451851852),
        (6.4, 6, 4.201851852),
    ]]
    chanfro6_side_1 = [part.faces().sort_by_distance(p)[0] for p in [
        (6.4, 4, 4.201851852),
    ]]
    chanfro6_edges_2 = [part.edges().sort_by_distance(p)[0] for p in [
        (6.4, 4, 38.748148148),
    ]]
    chanfro6_side_2 = [part.faces().sort_by_distance(p)[0] for p in [
        (8.4, 4, 38.748148148),
    ]]
    chanfro6_edges_3 = [part.edges().sort_by_distance(p)[0] for p in [
        (6.4, 6, 40.998148148),
    ]]
    chanfro6_side_3 = [part.faces().sort_by_distance(p)[0] for p in [
        (8.4, 6, 40.998148148),
    ]]
    chanfro6 = BRepFilletAPI_MakeChamfer(part.part.solid().wrapped)
    for e in chanfro6_edges_1:
        chanfro6.Add(CHANFRO6_SIZE, CHANFRO6_SIZE2, e.wrapped, chanfro6_side_1[0].wrapped)  # the first distance lies on this face
    for e in chanfro6_edges_2:
        chanfro6.Add(CHANFRO6_SIZE, CHANFRO6_SIZE2, e.wrapped, chanfro6_side_2[0].wrapped)  # the first distance lies on this face
    for e in chanfro6_edges_3:
        chanfro6.Add(CHANFRO6_SIZE, CHANFRO6_SIZE2, e.wrapped, chanfro6_side_3[0].wrapped)  # the first distance lies on this face
    add(Compound.cast(chanfro6.Shape()), mode=Mode.REPLACE)


solid = part.part
